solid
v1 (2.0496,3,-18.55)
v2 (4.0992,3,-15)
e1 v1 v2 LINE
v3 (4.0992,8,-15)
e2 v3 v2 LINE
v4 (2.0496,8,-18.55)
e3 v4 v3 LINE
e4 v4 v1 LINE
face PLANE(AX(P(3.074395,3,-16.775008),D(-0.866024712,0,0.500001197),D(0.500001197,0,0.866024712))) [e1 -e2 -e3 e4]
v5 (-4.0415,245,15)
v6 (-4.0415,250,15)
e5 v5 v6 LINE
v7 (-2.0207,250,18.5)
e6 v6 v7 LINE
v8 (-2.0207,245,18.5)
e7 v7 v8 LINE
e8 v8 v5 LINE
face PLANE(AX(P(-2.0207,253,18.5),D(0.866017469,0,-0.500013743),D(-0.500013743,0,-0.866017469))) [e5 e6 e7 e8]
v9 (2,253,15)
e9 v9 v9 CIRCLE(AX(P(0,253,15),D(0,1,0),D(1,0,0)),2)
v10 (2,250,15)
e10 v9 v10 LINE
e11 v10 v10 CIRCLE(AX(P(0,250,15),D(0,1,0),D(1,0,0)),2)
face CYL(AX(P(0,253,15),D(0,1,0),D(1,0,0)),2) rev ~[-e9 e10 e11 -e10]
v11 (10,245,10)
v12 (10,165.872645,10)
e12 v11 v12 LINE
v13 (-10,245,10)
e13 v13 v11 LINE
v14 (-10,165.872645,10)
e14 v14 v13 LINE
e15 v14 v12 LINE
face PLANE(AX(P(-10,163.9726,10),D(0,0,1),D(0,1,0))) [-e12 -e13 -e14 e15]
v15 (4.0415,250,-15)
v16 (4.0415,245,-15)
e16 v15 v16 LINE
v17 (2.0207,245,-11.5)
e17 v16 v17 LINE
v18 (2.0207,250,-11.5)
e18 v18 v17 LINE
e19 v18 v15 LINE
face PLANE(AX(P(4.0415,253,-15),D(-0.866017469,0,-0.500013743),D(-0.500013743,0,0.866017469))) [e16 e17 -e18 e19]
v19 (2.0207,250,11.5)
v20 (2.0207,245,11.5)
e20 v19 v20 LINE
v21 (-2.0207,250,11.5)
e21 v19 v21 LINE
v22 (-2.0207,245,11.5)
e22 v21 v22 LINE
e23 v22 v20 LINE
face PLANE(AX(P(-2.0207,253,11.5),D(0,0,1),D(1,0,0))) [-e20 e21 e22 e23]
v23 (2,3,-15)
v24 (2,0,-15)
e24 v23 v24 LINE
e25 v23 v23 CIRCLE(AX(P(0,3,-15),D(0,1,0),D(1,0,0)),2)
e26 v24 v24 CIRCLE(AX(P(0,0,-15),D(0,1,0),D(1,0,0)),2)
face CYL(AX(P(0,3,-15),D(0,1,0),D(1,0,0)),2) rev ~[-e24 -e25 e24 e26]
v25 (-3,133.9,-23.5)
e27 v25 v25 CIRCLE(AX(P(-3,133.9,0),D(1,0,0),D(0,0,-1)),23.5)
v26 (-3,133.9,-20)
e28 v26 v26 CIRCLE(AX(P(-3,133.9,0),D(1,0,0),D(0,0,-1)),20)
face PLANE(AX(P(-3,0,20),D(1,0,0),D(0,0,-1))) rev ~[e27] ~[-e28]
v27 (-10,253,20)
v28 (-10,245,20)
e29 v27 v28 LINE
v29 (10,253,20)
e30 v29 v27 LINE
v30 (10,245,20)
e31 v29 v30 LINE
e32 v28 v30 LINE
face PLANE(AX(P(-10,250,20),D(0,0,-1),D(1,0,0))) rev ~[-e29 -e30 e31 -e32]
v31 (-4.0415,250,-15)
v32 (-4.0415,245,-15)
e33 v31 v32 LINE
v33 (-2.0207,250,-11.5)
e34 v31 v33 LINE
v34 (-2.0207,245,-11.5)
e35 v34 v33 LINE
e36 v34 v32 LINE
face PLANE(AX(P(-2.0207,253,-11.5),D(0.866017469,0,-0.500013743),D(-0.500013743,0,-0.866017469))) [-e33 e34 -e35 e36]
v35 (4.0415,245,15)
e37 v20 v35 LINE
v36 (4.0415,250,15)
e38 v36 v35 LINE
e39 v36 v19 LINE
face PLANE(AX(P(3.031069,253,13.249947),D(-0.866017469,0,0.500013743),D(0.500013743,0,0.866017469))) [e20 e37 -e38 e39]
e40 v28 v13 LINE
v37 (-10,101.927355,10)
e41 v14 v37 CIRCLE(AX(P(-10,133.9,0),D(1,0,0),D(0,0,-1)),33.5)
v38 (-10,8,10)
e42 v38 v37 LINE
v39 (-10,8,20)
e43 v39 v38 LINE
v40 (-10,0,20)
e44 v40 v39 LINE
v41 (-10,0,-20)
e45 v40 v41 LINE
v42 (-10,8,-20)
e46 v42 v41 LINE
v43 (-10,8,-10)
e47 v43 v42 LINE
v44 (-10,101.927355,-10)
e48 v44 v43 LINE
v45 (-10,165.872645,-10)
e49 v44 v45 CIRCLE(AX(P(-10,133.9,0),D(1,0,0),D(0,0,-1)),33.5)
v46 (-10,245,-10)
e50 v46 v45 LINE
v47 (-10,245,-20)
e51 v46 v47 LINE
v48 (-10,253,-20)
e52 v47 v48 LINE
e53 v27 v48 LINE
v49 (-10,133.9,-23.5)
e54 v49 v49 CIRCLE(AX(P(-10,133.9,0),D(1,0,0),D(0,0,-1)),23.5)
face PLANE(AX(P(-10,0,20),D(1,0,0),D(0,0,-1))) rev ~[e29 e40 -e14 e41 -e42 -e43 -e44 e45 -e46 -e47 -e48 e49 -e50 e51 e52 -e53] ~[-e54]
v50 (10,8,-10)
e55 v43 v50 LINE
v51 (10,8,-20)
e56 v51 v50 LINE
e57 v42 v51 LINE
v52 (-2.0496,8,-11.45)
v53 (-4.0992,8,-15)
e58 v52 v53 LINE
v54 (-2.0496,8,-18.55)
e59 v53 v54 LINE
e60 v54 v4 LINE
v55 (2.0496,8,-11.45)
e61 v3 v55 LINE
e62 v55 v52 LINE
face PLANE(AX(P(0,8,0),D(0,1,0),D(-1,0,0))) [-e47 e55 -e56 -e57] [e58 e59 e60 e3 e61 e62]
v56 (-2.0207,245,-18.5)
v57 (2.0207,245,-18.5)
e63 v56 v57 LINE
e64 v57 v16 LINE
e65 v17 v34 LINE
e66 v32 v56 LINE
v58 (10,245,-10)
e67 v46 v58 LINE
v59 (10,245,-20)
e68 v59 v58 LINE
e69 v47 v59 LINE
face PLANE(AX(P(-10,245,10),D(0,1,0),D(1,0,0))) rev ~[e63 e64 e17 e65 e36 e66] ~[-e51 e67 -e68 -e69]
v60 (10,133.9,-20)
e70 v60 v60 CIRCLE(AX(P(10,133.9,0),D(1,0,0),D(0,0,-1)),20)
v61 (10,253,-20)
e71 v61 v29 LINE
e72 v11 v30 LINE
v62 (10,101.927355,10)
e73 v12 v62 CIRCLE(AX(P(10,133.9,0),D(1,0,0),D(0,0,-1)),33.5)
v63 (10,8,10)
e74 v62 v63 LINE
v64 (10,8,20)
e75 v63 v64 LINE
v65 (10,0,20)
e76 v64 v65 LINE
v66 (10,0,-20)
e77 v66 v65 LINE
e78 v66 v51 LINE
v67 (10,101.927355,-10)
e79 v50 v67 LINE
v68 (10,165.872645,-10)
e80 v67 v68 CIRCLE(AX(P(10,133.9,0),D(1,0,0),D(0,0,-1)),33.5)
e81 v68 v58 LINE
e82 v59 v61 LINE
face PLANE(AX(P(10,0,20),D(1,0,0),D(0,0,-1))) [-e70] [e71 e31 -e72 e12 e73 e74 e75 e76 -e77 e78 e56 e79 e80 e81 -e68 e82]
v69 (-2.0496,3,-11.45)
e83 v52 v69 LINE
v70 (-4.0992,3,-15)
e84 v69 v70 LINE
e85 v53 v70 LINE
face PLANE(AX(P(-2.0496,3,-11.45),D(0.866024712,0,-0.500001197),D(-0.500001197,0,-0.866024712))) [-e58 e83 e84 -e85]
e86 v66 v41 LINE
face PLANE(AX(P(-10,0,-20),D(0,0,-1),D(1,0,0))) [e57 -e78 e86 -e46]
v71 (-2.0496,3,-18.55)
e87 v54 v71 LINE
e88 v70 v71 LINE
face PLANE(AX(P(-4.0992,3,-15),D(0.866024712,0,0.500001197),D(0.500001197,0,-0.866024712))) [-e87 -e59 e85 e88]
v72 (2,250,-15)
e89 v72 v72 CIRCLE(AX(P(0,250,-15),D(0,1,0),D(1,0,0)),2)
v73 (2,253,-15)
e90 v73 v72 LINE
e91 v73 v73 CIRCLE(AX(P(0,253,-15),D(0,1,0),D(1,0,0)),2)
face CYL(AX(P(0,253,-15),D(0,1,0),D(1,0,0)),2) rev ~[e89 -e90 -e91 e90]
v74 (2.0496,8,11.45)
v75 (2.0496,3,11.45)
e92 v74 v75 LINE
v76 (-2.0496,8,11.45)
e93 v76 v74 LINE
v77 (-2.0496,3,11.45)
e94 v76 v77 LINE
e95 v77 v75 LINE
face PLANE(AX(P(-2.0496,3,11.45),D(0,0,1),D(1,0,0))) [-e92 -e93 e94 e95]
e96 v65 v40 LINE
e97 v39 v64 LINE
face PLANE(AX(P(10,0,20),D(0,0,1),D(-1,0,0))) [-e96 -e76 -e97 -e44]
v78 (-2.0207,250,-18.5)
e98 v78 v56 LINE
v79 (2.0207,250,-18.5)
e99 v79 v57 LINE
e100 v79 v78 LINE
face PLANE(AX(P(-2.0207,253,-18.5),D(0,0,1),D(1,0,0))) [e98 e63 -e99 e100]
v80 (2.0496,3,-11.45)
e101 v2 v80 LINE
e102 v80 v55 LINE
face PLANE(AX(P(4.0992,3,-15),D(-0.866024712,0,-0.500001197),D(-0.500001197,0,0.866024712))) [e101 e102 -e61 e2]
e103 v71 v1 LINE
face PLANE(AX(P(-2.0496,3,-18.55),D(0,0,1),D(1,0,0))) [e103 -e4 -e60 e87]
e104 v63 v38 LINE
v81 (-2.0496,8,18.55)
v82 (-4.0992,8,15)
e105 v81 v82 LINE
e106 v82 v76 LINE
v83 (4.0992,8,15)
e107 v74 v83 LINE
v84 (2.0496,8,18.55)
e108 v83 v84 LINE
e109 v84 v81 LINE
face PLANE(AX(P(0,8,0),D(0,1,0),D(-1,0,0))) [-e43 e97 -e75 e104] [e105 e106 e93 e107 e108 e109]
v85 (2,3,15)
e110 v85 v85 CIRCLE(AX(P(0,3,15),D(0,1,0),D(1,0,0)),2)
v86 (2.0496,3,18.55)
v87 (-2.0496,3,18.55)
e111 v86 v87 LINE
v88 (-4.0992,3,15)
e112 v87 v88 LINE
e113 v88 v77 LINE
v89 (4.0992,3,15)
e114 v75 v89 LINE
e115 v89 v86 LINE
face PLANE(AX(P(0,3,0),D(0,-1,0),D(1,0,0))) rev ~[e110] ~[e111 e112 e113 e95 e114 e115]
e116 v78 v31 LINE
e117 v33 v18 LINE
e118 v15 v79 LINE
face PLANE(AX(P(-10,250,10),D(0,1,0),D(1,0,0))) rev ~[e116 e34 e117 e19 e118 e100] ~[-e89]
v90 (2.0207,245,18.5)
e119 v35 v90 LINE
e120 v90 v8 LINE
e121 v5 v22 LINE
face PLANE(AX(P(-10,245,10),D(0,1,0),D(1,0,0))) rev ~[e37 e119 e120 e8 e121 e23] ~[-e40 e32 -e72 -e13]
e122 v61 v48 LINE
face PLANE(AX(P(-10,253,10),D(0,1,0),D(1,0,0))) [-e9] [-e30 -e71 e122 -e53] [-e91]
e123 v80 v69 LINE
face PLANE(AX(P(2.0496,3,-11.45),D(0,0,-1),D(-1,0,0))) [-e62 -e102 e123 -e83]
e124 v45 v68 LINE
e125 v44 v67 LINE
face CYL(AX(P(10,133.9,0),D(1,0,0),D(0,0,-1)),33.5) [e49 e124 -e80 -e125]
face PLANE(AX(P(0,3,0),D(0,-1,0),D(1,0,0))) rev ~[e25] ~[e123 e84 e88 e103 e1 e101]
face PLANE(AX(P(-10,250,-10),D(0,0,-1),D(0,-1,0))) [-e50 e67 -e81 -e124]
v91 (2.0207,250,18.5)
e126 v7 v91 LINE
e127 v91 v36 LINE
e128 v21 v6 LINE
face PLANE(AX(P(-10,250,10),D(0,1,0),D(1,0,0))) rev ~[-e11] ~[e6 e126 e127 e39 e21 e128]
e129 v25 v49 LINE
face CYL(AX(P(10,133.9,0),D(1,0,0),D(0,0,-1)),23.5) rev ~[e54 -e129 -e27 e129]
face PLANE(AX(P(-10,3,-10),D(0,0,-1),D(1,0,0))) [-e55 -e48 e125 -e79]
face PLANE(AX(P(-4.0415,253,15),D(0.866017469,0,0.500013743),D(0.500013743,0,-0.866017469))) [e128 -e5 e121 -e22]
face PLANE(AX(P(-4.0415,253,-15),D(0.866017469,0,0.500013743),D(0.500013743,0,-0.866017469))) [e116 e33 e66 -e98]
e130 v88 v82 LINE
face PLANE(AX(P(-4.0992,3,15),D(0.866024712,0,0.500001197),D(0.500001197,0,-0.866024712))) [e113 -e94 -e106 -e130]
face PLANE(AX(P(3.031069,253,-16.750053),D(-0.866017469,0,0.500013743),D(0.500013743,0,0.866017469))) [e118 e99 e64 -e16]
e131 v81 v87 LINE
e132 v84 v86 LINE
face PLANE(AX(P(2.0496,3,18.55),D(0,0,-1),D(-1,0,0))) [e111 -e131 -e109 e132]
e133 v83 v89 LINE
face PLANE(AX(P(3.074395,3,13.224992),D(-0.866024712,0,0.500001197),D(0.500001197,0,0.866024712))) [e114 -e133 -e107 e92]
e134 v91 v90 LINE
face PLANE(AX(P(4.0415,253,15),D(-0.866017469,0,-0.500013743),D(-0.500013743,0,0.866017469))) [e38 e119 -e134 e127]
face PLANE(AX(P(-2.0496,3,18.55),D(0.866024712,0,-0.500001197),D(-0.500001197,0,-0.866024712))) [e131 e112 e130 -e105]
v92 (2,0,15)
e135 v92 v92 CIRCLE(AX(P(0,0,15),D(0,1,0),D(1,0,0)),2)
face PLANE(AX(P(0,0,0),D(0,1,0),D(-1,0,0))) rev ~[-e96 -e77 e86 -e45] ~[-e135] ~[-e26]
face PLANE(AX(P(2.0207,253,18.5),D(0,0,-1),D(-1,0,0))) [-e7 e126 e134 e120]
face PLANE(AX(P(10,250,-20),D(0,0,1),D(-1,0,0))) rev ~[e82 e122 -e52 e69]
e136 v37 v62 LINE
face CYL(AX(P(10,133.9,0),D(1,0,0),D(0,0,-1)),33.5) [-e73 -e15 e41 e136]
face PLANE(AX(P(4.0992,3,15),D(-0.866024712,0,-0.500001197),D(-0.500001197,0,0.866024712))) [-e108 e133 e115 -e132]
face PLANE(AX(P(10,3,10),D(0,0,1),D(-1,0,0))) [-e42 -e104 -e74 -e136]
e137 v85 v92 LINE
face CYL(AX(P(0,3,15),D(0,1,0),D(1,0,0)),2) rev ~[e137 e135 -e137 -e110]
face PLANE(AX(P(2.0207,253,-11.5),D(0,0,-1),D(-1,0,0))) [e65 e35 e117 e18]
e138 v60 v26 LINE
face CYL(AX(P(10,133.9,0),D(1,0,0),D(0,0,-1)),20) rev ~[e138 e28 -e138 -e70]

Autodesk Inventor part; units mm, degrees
ref_plane "YZ Plane" through (0, 0, 0) normal (1, 0, 0) x (0, 1, 0)
ref_plane "XZ Plane" through (0, 0, 0) normal (0, 1, 0) x (-1, 0, 0)
ref_plane "XY Plane" through (0, 0, 0) normal (0, 0, 1) x (1, 0, 0)
sketch "Sketch4" plane through (0, 0, 0) normal (0, 1, 0) x (-1, 0, 0)
  line L0 (-10, 20) -> (10, 20)
  line L1 (10, 20) -> (10, -20)
  line L2 (10, -20) -> (-10, -20)
  line L3 (-10, -20) -> (-10, 20)
  line L4 (-10, 20) -> (10, -20) construction
  line L5 (10, 20) -> (-10, -20) construction
  point P0 (0, 0)
  dimension "d8" = 20
  dimension "d9" = 40
extrude "Extrusion2" add sketch "Sketch4" along normal blind 3
sketch "Sketch5" plane through (0, 3, 0) normal (0, 1, 0) x (1, 0, 0)
  line L0 (10, -10) -> (-10, -10)
  line L1 (-10, -10) -> (-10, 10)
  line L2 (-10, 10) -> (10, 10)
  line L3 (10, 10) -> (10, -10)
  line L4 (10, -10) -> (-10, 10) construction
  line L5 (-10, -10) -> (10, 10) construction
  point P0 (0, 0)
  dimension "d12" = 20
  dimension "d13" = 20
extrude "Extrusion3" add sketch "Sketch5" along normal blind 100
sketch "Sketch7" plane through (0, 3, 0) normal (0, 1, 0) x (1, 0, 0)
  circle A0 centre (0, 15) radius 2
  circle A1 centre (0, -15) radius 2
  point P0 (0, 0)
  dimension "d20" = 4
  dimension "d21" = 4
extrude "Extrusion5" cut sketch "Sketch7" against normal blind 10
sketch "Sketch8" plane through (0, 3, 0) normal (0, 1, 0) x (1, 0, 0)
  circle A0 centre (0, 15) radius 2 projected
  circle A1 centre (0, 15) radius 3.55
  circle A2 centre (0, -15) radius 2 projected
  circle A3 centre (0, -15) radius 3.55
  line L0 (2.0496, -11.45) -> (4.0992, -15)
  line L1 (4.0992, -15) -> (2.0496, -18.55)
  line L2 (2.0496, -18.55) -> (-2.0496, -18.55)
  line L3 (-2.0496, -18.55) -> (-4.0992, -15)
  line L4 (-4.0992, -15) -> (-2.0496, -11.45)
  line L5 (-2.0496, -11.45) -> (2.0496, -11.45)
  line L6 (2.0496, 18.55) -> (4.0992, 15)
  line L7 (4.0992, 15) -> (2.0496, 11.45)
  line L8 (2.0496, 11.45) -> (-2.0496, 11.45)
  line L9 (-2.0496, 11.45) -> (-4.0992, 15)
  line L10 (-4.0992, 15) -> (-2.0496, 18.55)
  line L11 (-2.0496, 18.55) -> (2.0496, 18.55)
  point P0 (0, 0)
  point P1 (0, -11.45)
  point P2 (0, 18.55)
  dimension "d24" = 7.1
  dimension "d25" = 7.1
extrude "Extrusion6" cut sketch "Sketch8" against normal blind 3 contours A0 | A1 | A1 L6 L7 | A1 L11 L6 | L7 L8 A1 | A1 L10 L11 | L8 L9 A1 | A1 L9 L10 | A2 | A3 | A3 L0 L1 | A3 L5 L0 | L1 L2 A3 | A3 L4 L5 | L2 L3 A3 | A3 L3 L4
sketch "Sketch9" plane through (0, 0, 0) normal (0, -1, 0) x (1, 0, 0)
  line L0 (2.0496, 11.45) -> (4.0992, 15) projected
  circle A0 centre (0, 15) radius 4.0992
  circle A1 centre (0, -15) radius 4.0992
  point P0 (0, 0)
  point P1 (4.0992, -15)
sketch "Sketch11" plane through (-10, 0, -20) normal (-1, 0, 0) x (0, 0, 1)
  line L0 (10, 0) -> (30, 0)
  line L1 (30, 0) -> (30, 250)
  line L2 (30, 250) -> (10, 250)
  line L3 (10, 250) -> (10, 0)
  arc A0 (29.9121, 100) -> (10.0879, 100) centre (20, 132) ccw projected
  line L4 (10, 250) -> (30, 250)
  line L5 (30, 250) -> (30, 163.9726)
  line L6 (30, 163.9726) -> (10, 163.9726)
  line L7 (10, 163.9726) -> (10, 250)
  point P0 (20, 0)
  point P1 (10, 163.9726)
  dimension "d29" = 250
extrude "Extrusion7" add sketch "Sketch11" against normal blind 20 contours L3 L2 L1 A0
sketch "Sketch14" plane through (-10, 250, 10) normal (0, 1, 0) x (1, 0, 0)
  line L0 (0, 0) -> (0, -10) projected
  line L1 (20, -10) -> (20, 30) projected
  line L2 (0, -10) -> (20, -10)
  line L3 (20, -10) -> (20, 30)
  line L4 (20, 30) -> (0, 30)
  line L5 (0, 30) -> (0, -10)
  point P0 (10, 10)
extrude "Extrusion8" add sketch "Sketch14" along normal blind 3
sketch "Sketch15" plane through (-10, 253, 10) normal (0, 1, 0) x (1, 0, 0)
  circle A0 centre (10, 25) radius 3.5
  circle A1 centre (10, -5) radius 3.5
  line L0 (12.0207, 28.5) -> (14.0415, 25)
  line L1 (14.0415, 25) -> (12.0207, 21.5)
  line L2 (12.0207, 21.5) -> (7.9793, 21.5)
  line L3 (7.9793, 21.5) -> (5.9585, 25)
  line L4 (5.9585, 25) -> (7.9793, 28.5)
  line L5 (7.9793, 28.5) -> (12.0207, 28.5)
  line L6 (12.0207, -1.5) -> (14.0415, -5)
  line L7 (14.0415, -5) -> (12.0207, -8.5)
  line L8 (12.0207, -8.5) -> (7.9793, -8.5)
  line L9 (7.9793, -8.5) -> (5.9585, -5)
  line L10 (5.9585, -5) -> (7.9793, -1.5)
  line L11 (7.9793, -1.5) -> (12.0207, -1.5)
  point P0 (10, 10)
  point P1 (10, 28.5)
  point P2 (10, -1.5)
  dimension "d34" = 7
  dimension "d35" = 7
extrude "Extrusion9" cut sketch "Sketch15" against normal blind 3
sketch "Sketch16" plane through (-10, 253, 10) normal (0, 1, 0) x (1, 0, 0)
  line L0 (12.0207, 21.5) -> (14.0415, 25) projected
  circle A0 centre (10, 25) radius 4.0415
  line L1 (7.9793, -1.5) -> (12.0207, -1.5) projected
  circle A1 centre (10, -5) radius 4.0415
  point P0 (10, 10)
sketch "Sketch17" plane through (10, 0, 20) normal (1, 0, 0) x (0, 0, -1)
  circle A0 centre (20, 133.9) radius 23.5
  circle A1 centre (20, 133.9) radius 33.5
  point P0 (20, 0)
  dimension "d38" = 47
  dimension "d39" = 67
extrude "Extrusion10" add sketch "Sketch17" against normal blind 20
sketch "Sketch18" plane through (10, 0, 20) normal (1, 0, 0) x (0, 0, -1)
  point P0 (20, 0)
sketch "Sketch19" plane through (10, 0, 20) normal (1, 0, 0) x (0, 0, -1)
  circle A0 centre (20, 133.9) radius 23.5 projected
  circle A1 centre (20, 133.9) radius 20
  point P0 (20, 0)
  dimension "d42" = 40
extrude "Extrusion11" add sketch "Sketch19" against normal blind 13
thicken "Thicken1" operation add thickness 5 both sides no extend neighbours yes toward (0, 1, 0) faces at (8.0331, 3, 15) (8.0331, 3, -15)
sketch "Sketch20" plane through (0, 0, 0) normal (0, -1, 0) x (1, 0, 0)
  line L0 (-10, 20) -> (10, 20) projected
  line L1 (10, -20) -> (-10, -20) projected
  line L2 (-10, 20) -> (10, 20)
  line L3 (10, 20) -> (10, -20)
  line L4 (10, -20) -> (-10, -20)
  line L5 (-10, -20) -> (-10, 20)
  point P0 (0, 0)
extrude "Extrusion12" add sketch "Sketch20" against normal blind 3
sketch "Sketch21" plane through (0, 3, 0) normal (0, 1, 0) x (1, 0, 0)
  circle A0 centre (0, -15) radius 2
  circle A1 centre (0, 15) radius 2
  point P0 (0, 0)
  dimension "d49" = 4
  dimension "d50" = 4
extrude "Extrusion13" cut sketch "Sketch21" against normal blind 3
thicken "Thicken2" operation add thickness 5 both sides no extend neighbours yes toward (0, -1, 0) faces at (8.0138, 250, -15) (8.0138, 250, 15)
sketch "Sketch22" plane through (-10, 253, 10) normal (0, 1, 0) x (1, 0, 0)
  line L0 (0, -10) -> (20, -10) projected
  line L1 (20, 30) -> (0, 30) projected
  line L2 (0, -10) -> (20, -10)
  line L3 (20, -10) -> (20, 30)
  line L4 (20, 30) -> (0, 30)
  line L5 (0, 30) -> (0, -10)
  point P0 (10, 10)
extrude "Extrusion14" add sketch "Sketch22" against normal blind 3
sketch "Sketch23" plane through (-10, 253, 10) normal (0, 1, 0) x (1, 0, 0)
  circle A0 centre (10, -5) radius 2 projected
  circle A1 centre (10, -5) radius 2
  circle A2 centre (10, 25) radius 2 projected
  circle A3 centre (10, 25) radius 2
  point P0 (10, 10)
  dimension "d57" = 4
  dimension "d58" = 4
extrude "Extrusion15" cut sketch "Sketch23" against normal blind 3
properties part number "pylon"
